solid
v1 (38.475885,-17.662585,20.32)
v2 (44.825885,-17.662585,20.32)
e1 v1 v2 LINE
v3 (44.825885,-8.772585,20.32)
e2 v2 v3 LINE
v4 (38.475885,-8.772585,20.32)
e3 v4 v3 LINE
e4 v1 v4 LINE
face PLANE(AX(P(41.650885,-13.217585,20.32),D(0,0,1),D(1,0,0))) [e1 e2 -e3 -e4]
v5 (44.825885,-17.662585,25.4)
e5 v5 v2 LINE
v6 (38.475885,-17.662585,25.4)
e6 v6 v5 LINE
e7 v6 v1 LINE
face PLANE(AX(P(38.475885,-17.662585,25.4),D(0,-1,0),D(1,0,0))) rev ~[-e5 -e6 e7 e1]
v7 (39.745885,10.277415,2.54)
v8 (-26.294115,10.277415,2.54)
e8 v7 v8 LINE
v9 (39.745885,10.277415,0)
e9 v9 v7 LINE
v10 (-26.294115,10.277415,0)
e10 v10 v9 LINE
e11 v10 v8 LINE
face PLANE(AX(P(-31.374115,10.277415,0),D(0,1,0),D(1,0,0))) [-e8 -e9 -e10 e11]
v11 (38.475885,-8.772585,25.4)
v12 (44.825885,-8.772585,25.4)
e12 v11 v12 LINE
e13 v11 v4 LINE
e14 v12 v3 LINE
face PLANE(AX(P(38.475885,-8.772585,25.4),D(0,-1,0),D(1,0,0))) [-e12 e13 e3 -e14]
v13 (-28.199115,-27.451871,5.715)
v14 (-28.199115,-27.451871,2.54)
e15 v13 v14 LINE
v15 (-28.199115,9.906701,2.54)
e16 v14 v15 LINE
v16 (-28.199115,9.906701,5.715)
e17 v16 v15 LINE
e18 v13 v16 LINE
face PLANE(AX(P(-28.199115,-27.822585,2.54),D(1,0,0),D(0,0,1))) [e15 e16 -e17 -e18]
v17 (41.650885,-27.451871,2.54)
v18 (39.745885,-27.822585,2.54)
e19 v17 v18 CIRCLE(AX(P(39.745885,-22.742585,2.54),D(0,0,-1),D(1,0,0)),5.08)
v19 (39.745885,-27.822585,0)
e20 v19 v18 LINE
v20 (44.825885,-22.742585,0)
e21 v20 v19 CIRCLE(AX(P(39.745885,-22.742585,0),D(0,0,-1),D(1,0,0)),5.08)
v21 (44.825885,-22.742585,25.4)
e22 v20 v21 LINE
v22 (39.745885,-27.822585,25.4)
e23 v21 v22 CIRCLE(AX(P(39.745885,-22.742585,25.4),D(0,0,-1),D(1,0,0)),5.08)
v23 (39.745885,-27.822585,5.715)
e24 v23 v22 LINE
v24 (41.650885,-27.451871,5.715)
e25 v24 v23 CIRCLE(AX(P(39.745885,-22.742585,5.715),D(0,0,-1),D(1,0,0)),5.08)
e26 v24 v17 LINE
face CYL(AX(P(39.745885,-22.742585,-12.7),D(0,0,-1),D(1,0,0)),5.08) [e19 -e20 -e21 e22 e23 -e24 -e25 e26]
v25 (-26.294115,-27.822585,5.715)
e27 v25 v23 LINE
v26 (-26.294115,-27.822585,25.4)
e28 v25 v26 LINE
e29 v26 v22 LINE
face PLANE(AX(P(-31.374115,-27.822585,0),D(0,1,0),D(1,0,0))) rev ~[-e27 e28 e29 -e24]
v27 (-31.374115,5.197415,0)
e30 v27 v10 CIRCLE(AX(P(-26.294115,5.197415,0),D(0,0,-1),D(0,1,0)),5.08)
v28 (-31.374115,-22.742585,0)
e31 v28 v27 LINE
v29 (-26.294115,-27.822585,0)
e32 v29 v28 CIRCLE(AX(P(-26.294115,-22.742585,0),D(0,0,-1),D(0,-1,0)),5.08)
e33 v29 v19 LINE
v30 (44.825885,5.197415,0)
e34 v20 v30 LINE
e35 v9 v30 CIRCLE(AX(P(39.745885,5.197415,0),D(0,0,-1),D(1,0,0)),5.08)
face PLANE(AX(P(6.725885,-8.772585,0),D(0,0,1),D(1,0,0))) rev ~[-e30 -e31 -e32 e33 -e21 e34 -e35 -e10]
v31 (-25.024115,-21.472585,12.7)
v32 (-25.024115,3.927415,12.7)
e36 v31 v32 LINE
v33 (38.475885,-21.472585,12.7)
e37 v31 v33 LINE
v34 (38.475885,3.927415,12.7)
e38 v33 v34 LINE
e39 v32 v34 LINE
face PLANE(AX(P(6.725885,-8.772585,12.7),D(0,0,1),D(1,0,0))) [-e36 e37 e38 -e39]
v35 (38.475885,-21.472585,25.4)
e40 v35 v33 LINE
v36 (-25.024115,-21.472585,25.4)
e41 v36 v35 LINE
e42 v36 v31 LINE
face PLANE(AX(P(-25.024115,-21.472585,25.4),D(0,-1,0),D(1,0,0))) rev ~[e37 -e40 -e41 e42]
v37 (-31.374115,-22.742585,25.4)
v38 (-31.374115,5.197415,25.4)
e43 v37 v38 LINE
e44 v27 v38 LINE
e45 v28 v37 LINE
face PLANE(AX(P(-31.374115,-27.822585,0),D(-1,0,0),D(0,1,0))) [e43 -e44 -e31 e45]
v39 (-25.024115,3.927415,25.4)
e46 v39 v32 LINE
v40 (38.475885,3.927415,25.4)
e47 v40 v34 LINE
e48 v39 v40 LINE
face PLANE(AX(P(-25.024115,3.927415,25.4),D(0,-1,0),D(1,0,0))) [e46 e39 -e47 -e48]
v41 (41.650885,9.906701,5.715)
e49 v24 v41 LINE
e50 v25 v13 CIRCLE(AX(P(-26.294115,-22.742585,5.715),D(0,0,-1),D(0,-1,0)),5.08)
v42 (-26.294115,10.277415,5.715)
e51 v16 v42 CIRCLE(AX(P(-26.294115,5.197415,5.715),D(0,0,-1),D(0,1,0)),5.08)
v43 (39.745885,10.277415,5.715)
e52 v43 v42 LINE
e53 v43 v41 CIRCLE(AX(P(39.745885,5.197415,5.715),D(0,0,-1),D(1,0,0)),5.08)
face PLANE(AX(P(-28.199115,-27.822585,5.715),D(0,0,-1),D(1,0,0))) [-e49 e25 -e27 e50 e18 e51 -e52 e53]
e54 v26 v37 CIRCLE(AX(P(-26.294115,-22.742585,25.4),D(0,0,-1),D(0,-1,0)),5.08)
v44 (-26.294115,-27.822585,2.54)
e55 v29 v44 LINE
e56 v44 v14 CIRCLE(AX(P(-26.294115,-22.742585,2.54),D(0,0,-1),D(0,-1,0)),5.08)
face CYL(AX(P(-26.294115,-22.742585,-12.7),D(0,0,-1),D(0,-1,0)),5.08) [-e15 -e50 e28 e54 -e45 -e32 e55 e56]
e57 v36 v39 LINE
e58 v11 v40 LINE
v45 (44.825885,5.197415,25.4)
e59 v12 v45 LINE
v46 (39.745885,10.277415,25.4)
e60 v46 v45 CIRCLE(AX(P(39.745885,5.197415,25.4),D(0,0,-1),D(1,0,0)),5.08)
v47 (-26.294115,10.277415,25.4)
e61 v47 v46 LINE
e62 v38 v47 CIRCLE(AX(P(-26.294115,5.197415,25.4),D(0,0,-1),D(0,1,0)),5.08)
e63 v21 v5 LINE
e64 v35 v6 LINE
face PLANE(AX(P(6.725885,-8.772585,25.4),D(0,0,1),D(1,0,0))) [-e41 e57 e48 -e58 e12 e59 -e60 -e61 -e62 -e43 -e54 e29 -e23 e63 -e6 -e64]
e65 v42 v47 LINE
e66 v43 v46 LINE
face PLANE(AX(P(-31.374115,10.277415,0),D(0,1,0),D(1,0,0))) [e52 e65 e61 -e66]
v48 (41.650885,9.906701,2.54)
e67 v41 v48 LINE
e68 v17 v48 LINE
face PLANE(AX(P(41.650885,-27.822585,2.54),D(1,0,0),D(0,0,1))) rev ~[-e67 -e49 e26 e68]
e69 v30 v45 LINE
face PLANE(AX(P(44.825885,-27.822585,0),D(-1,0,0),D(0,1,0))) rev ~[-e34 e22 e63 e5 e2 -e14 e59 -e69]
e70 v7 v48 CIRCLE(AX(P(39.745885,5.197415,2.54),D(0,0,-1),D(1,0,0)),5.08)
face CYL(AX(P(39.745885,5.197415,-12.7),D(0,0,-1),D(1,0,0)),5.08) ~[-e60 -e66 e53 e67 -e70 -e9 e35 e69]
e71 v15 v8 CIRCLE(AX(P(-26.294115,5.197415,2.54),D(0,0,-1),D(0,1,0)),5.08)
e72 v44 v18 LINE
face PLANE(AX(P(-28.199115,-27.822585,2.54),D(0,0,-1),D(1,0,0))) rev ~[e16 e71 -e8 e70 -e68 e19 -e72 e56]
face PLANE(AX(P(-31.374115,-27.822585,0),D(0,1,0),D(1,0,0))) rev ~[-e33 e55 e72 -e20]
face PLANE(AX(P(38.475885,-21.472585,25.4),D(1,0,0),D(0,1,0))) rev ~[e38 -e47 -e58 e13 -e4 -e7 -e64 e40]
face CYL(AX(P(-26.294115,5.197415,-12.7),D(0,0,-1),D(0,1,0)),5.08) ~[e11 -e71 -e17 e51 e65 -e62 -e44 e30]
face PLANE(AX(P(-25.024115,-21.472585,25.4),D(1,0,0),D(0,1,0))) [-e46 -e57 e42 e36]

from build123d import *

# Parameters (mm, degrees)
F0_W        = 76.2
F0_H        = 38.1
F1_DEPTH    = 25.4
F2_W        = 69.85
F2_H        = 3.175
F3_DEPTH    = 38.101
F4_W        = 63.5
F4_H        = 25.4
F5_DEPTH    = 12.7
F6_W        = 6.35
F6_H        = 8.89
F7_DEPTH    = 5.08
F8_T1_DEPTH = 50.8


# Not quite as in the source:
# - a fillet or chamfer that OpenCascade refuses, or shapes differently, is made with other operations: its cross-section is extruded or revolved along the edge and cut away or added


with BuildPart() as f1:
    # F0 (on Top) → F1 (new body)
    with BuildSketch(Plane.XY):
        with Locations((6.725884974, -8.772585205)):
            Rectangle(F0_W, F0_H)
    extrude(amount=F1_DEPTH)

    # F2 (on face) → F3 (cut, through all)
    with BuildSketch(Plane.XZ.offset(27.822585205)):
        with Locations((6.725884974, 4.1275)):
            Rectangle(F2_W, F2_H)
    extrude(amount=-F3_DEPTH, mode=Mode.SUBTRACT)

    # F4 (on face) → F5 (cut)
    with BuildSketch(Plane.XY.offset(25.4)):
        with Locations((6.725884974, -8.772585205)):
            Rectangle(F4_W, F4_H)
    extrude(amount=-F5_DEPTH, mode=Mode.SUBTRACT)

    # F6 (on face) → F7 (cut)
    with BuildSketch(Plane.XY.offset(25.4)):
        with Locations((41.650884974, -13.217585205)):
            Rectangle(F6_W, F6_H)
    extrude(amount=-F7_DEPTH, mode=Mode.SUBTRACT)

    # F8: fillet of radius 5.08 on 4 edges, made by hand

    # F8_s2 → F8_t1 (cut)
    with BuildSketch(Plane.XY.offset(-12.7)):
        with BuildLine():
            ThreePointArc((44.825884974, 5.197414795), (43.3379874224, 8.7895172434), (39.745884974, 10.277414795))
            Line((39.745884974, 10.277414795), (44.825884974, 10.277414795))
            Line((44.825884974, 10.277414795), (44.825884974, 5.197414795))
        make_face()
        with BuildLine():
            ThreePointArc((-26.294115026, 10.277414795), (-29.8862174744, 8.7895172434), (-31.374115026, 5.197414795))
            Line((-31.374115026, 5.197414795), (-31.374115026, 10.277414795))
            Line((-31.374115026, 10.277414795), (-26.294115026, 10.277414795))
        make_face()
        with BuildLine():
            ThreePointArc((44.825884974, -22.742585205), (43.3379874224, -26.3346876534), (39.745884974, -27.822585205))
            Line((39.745884974, -27.822585205), (44.825884974, -27.822585205))
            Line((44.825884974, -27.822585205), (44.825884974, -22.742585205))
        make_face()
        with BuildLine():
            ThreePointArc((-26.294115026, -27.822585205), (-29.8862174744, -26.3346876534), (-31.374115026, -22.742585205))
            Line((-31.374115026, -22.742585205), (-31.374115026, -27.822585205))
            Line((-31.374115026, -27.822585205), (-26.294115026, -27.822585205))
        make_face()
    extrude(amount=F8_T1_DEPTH, mode=Mode.SUBTRACT)


solid = f1.part
